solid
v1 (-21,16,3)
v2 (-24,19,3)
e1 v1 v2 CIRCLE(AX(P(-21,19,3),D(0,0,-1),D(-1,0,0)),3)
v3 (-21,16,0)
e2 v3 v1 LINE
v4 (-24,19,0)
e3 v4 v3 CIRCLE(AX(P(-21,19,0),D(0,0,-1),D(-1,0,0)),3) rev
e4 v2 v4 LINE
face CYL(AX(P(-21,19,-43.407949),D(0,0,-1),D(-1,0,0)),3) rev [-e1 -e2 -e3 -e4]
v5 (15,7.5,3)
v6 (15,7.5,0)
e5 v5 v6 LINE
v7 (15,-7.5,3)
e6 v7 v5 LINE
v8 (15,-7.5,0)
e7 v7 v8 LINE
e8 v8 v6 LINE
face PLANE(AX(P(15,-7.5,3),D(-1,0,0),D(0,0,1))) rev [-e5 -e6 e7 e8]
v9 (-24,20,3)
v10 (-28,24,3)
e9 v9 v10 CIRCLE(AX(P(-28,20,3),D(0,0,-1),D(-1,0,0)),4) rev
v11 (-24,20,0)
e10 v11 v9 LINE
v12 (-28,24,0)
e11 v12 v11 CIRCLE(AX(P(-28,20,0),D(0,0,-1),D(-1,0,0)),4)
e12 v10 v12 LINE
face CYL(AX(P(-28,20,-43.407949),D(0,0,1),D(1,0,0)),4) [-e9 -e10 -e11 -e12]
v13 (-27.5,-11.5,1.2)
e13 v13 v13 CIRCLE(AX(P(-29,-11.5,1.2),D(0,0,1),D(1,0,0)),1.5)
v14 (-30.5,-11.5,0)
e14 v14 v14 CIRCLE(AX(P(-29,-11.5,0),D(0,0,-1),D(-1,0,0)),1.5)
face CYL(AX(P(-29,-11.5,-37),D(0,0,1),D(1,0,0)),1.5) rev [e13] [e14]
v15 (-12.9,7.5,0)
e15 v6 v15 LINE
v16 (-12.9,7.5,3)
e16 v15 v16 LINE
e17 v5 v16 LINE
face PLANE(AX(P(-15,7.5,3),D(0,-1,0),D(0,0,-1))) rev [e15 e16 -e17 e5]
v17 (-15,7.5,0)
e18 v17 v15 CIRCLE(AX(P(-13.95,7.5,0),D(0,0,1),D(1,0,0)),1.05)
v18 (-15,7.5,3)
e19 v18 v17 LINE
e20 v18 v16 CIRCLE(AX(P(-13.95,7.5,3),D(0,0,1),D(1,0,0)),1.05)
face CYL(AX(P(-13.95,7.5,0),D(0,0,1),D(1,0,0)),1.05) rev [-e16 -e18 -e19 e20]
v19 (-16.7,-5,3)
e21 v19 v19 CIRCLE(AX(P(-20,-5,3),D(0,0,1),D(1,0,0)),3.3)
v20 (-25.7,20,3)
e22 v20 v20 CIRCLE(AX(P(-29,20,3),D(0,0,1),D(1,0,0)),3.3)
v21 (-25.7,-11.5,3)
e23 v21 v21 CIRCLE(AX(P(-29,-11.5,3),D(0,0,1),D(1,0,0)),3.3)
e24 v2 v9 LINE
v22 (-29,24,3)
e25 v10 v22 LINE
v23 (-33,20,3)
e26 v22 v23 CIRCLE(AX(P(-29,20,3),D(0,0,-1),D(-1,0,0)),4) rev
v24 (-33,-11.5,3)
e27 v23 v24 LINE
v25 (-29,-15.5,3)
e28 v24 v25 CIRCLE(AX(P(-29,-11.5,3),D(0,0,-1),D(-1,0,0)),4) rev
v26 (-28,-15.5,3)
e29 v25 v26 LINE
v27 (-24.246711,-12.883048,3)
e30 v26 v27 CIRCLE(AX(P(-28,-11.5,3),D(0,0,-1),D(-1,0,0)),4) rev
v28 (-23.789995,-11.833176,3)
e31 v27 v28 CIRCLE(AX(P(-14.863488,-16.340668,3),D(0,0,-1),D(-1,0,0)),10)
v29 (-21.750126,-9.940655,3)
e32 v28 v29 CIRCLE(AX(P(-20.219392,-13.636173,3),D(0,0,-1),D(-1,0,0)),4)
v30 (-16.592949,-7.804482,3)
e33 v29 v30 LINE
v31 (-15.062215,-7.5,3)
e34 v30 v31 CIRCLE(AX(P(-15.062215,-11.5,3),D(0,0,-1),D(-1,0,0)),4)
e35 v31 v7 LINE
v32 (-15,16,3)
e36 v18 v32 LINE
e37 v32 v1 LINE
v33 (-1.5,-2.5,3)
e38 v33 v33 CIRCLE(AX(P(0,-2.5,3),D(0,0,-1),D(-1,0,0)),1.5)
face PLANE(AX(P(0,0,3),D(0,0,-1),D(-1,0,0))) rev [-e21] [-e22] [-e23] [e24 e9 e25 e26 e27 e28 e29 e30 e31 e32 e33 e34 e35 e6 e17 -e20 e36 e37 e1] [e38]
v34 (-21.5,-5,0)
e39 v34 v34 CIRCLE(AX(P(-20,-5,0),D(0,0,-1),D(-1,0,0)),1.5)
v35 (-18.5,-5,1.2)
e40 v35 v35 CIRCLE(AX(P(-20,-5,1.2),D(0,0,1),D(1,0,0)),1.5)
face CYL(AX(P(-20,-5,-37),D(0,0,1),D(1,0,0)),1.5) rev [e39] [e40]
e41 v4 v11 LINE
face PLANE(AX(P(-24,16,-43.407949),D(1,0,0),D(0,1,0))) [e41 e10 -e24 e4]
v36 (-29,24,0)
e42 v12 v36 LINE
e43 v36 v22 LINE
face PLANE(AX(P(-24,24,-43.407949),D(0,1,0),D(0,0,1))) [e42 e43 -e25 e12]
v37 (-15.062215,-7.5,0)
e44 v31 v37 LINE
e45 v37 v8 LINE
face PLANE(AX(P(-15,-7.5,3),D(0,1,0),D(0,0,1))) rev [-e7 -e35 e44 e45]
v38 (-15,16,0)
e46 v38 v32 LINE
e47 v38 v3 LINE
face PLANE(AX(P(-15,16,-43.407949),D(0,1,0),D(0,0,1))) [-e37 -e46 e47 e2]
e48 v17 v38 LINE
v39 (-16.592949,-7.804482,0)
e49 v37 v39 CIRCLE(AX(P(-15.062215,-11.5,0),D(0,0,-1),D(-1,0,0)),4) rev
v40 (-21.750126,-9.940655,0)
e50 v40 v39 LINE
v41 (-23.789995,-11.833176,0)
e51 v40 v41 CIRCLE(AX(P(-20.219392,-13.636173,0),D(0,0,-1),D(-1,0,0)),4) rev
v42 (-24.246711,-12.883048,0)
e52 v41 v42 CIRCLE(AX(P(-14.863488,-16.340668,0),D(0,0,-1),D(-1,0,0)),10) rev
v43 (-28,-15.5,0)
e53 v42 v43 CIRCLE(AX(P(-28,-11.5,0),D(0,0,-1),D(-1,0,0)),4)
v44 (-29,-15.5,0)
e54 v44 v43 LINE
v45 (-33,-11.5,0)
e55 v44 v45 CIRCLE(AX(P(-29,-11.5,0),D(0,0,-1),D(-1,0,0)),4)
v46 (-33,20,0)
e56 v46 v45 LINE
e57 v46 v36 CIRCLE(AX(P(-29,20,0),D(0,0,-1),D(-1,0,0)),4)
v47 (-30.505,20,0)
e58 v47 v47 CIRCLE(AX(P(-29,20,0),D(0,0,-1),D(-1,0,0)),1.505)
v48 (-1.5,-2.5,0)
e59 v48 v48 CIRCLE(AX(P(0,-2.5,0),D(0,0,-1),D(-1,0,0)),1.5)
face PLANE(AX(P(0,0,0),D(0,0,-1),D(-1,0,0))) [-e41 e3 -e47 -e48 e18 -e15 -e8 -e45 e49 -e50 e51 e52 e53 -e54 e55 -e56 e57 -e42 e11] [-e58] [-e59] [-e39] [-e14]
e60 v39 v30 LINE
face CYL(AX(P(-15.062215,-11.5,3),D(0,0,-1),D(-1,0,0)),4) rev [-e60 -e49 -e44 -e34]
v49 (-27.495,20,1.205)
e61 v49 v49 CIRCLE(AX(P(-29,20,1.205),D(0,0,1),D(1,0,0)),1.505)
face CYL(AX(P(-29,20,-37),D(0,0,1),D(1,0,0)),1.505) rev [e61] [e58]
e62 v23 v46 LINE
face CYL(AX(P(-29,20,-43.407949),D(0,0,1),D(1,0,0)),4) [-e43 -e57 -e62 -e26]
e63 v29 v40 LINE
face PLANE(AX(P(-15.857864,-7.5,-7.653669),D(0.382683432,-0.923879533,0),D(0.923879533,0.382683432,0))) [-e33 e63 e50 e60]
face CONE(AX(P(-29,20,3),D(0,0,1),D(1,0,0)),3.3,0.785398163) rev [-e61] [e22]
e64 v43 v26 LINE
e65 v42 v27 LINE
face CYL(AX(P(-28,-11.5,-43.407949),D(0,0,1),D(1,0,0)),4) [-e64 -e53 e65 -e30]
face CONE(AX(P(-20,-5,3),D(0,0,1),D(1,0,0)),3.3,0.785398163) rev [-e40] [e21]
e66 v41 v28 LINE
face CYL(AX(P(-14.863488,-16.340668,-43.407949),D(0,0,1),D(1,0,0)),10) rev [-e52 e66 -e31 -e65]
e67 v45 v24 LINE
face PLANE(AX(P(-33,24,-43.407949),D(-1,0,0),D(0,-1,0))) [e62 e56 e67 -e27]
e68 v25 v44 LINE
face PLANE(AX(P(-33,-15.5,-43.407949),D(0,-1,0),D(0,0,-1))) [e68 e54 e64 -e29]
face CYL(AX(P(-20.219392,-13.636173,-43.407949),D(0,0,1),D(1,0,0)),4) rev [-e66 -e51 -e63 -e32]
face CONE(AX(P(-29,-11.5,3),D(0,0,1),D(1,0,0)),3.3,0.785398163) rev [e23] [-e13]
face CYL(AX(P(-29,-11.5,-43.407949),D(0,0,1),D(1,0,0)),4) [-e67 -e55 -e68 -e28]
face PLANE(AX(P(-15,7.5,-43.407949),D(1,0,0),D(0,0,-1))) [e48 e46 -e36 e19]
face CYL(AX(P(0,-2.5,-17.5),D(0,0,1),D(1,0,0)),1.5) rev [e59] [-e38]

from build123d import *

# Parameters (mm, degrees)
SKETCH_1_W                  = 30
SKETCH_1_H                  = 15
EXTRUDE_1_DEPTH             = 3
EXTRUDE_2_DEPTH             = 3
FILLET_1_R                  = 4
FILLET_2_R                  = 3
FILLET_5_R                  = 4
FILLET_6_R                  = 4
SKETCH_3_R                  = 1.05
CUT_EXTRUDE_1_DEPTH         = 3
SKETCH_4_R                  = 1.505
CUT_EXTRUDE_2_DEPTH         = 40
EXTRUDE_START               = -11
EXTRUDE_3_OUTLINE_W         = 5.656854249
EXTRUDE_3_OUTLINE_H         = 3
EXTRUDE_3_DEPTH             = 2.161165235
SKETCH_7_R                  = 1.5
CUT_EXTRUDE_3_DEPTH         = 40
FILLET_7_R                  = 10
FILLET_8_R                  = 10
SKETCH_8_R                  = 1.5
CUT_EXTRUDE_4_DEPTH         = 40
EXTRUDE_4_DEPTH             = 3
HOLE_WIZARD_M3_1_AT_2_COUNT = 2
HOLE_WIZARD_M3_1_AT_2_PITCH = 26.570660511
HOLE_WIZARD_M3_1_AT_3_COUNT = 2
HOLE_WIZARD_M3_1_AT_3_PITCH = 31.5
FILLET_9_R                  = 4
SKETCH_12_R                 = 1.5
CUT_EXTRUDE_5_DEPTH         = 20.5


with BuildPart() as part:
    # 草图1 → 凸台-拉伸1 (new body)
    with BuildSketch(Plane.XY):
        Rectangle(SKETCH_1_W, SKETCH_1_H)
    extrude(amount=EXTRUDE_1_DEPTH)

    # 草图2 → 凸台-拉伸2 (add)
    with BuildSketch(Plane.XY.offset(3)):
        Polygon((-15, 7.5), (-15, 16), (-24, 16), (-24, 24), (-33, 24), (-33, -15.5), (-24, -15.5), (-24, -7.5), (-15, -7.5), align=None)
    extrude(amount=-EXTRUDE_2_DEPTH)

    # 圆角1
    fillet_1_edges = [part.edges().sort_by_distance(p)[0] for p in [
        (-24, 24, 1.5),
        (-33, 24, 1.5),
    ]]
    fillet(fillet_1_edges, radius=FILLET_1_R)

    # 圆角2
    fillet_2_edges = [part.edges().sort_by_distance(p)[0] for p in [
        (-24, 16, 1.5),
    ]]
    fillet(fillet_2_edges, radius=FILLET_2_R)

    # 圆角5
    fillet_5_edges = [part.edges().sort_by_distance(p)[0] for p in [
        (-33, -15.5, 1.5),
        (-24, -15.5, 1.5),
    ]]
    fillet(fillet_5_edges, radius=FILLET_5_R)

    # 圆角6
    fillet_6_edges = [part.edges().sort_by_distance(p)[0] for p in [
        (-24, -7.5, 1.5),
    ]]
    fillet(fillet_6_edges, radius=FILLET_6_R - 0.0001)  # a hair under: the kernel refuses the full size

    # 草图3 → 切除-拉伸1 (cut)
    with BuildSketch(Plane.XY.offset(3)):
        with Locations((-13.95, 7.5)):
            Circle(SKETCH_3_R)
    extrude(amount=-CUT_EXTRUDE_1_DEPTH, mode=Mode.SUBTRACT)

    # 草图4 → 切除-拉伸2 (cut)
    with BuildSketch(Plane.XY.offset(3)):
        with Locations((-29, 20)):
            Circle(SKETCH_4_R)
    extrude(amount=-CUT_EXTRUDE_2_DEPTH, mode=Mode.SUBTRACT)

    # 凸台-拉伸3: read off the stored shape, not the designer's step
    # 凸台-拉伸3 outline → 凸台-拉伸3 (add)
    with BuildSketch(Plane(origin=(0, 0, 0), x_dir=(0.7071067811865471, 0.707106781186548, 0), z_dir=(0.707106781186548, -0.707106781186547, 0)).offset(EXTRUDE_START)):
        with Locations((-22.273863608, 1.5)):
            Rectangle(EXTRUDE_3_OUTLINE_W, EXTRUDE_3_OUTLINE_H)
    extrude(amount=EXTRUDE_3_DEPTH)

    # 草图7 → 切除-拉伸3 (cut)
    with BuildSketch(Plane.XY.offset(3)):
        with Locations((-20, -5)):
            Circle(SKETCH_7_R)
    extrude(amount=-CUT_EXTRUDE_3_DEPTH, mode=Mode.SUBTRACT)

    # 圆角7
    fillet_7_edges = [part.edges().sort_by_distance(p)[0] for p in [
        (-20, -7.5, 1.5),
    ]]
    fillet(fillet_7_edges, radius=FILLET_7_R)

    # 圆角8
    # the kernel refuses this fillet: 10 mm, written as the material it adds along each edge
    with BuildSketch(Plane(origin=(-24, -11.5, 3), x_dir=(0.7071067811080579, 0.7071067812650372, 0), z_dir=(0, 0, -1))) as fillet_8_piece_1:
        with BuildLine():
            CenterArc((3.037620293, 9.883358261), FILLET_8_R, 245.228316877, 16.01201465)
            Line((-1.152413577, 0.803511557), (-1.236214254, 0.621914623))
            ThreePointArc((-1.236214254, 0.621914623), (-0.655043014, 0.288687166), (-0.141421356, -0.141421356))
            Line((-0.141421356, -0.141421356), (0, -0.2))
            ThreePointArc((0, -0.2), (0.757359313, -0.2), (1.484260592, -0.197667165))
            Line((1.484260592, -0.197667165), (1.514718626, 0))
        make_face()
    extrude(amount=3)

    # 草图8 → 切除-拉伸4 (cut)
    with BuildSketch(Plane.XY.offset(3)):
        with Locations((-29, -11.5)):
            Circle(SKETCH_8_R)
    extrude(amount=-CUT_EXTRUDE_4_DEPTH, mode=Mode.SUBTRACT)

    # 草图11 → 凸台-拉伸4 (add)
    with BuildSketch(Plane.XY.offset(3)):
        with BuildLine():
            Line((-15.857864376, -7.5), (-22.928932188, -10.428932188))
            ThreePointArc((-22.928932188, -10.428932188), (-19.6846987, -8.261204675), (-15.857864376, -7.5))
        make_face()
    extrude(amount=-EXTRUDE_4_DEPTH)

    # 草图10 → M3 十字槽半沉头木螺钉的锥形沉头孔1 (revolve, cut)
    with BuildSketch(Plane(origin=(-29, 20, 3), x_dir=(0, -1, 0), z_dir=(1, 0, 0))):
        Polygon((0, 0), (0, 3), (1.5, 3), (1.5, 1.8), (3.3, 0), align=None)
    hole_wizard_m3_1 = revolve(axis=Axis((-29, 20, 9.35), (0, 0, -1)), mode=Mode.SUBTRACT)

    # M3 十字槽半沉头木螺钉的锥形沉头孔1 at 2: M3 十字槽半沉头木螺钉的锥形沉头孔1 ×2
    with Locations(*[Vector(0.33871946827274174, -0.9408874118687268, 0) * (i * HOLE_WIZARD_M3_1_AT_2_PITCH) for i in range(1, HOLE_WIZARD_M3_1_AT_2_COUNT)]):
        add(hole_wizard_m3_1, mode=Mode.SUBTRACT)

    # M3 十字槽半沉头木螺钉的锥形沉头孔1 at 3: M3 十字槽半沉头木螺钉的锥形沉头孔1 ×2
    with Locations(*[(0, -i * HOLE_WIZARD_M3_1_AT_3_PITCH, 0) for i in range(1, HOLE_WIZARD_M3_1_AT_3_COUNT)]):
        add(hole_wizard_m3_1, mode=Mode.SUBTRACT)

    # 圆角9
    fillet_9_edges = [part.edges().sort_by_distance(p)[0] for p in [
        (-15.857864377, -7.5, 1.5),
        (-22.928932188, -10.428932188, 1.5),
    ]]
    fillet(fillet_9_edges, radius=FILLET_9_R)

    # 草图12 → 切除-拉伸5 (cut, symmetric)
    with BuildSketch(Plane.XY.offset(3)):
        with Locations(Location((0, -2.5, 0), (0, 0, 180))):
            Circle(SKETCH_12_R)
    extrude(amount=CUT_EXTRUDE_5_DEPTH, both=True, mode=Mode.SUBTRACT)


solid = part.part
